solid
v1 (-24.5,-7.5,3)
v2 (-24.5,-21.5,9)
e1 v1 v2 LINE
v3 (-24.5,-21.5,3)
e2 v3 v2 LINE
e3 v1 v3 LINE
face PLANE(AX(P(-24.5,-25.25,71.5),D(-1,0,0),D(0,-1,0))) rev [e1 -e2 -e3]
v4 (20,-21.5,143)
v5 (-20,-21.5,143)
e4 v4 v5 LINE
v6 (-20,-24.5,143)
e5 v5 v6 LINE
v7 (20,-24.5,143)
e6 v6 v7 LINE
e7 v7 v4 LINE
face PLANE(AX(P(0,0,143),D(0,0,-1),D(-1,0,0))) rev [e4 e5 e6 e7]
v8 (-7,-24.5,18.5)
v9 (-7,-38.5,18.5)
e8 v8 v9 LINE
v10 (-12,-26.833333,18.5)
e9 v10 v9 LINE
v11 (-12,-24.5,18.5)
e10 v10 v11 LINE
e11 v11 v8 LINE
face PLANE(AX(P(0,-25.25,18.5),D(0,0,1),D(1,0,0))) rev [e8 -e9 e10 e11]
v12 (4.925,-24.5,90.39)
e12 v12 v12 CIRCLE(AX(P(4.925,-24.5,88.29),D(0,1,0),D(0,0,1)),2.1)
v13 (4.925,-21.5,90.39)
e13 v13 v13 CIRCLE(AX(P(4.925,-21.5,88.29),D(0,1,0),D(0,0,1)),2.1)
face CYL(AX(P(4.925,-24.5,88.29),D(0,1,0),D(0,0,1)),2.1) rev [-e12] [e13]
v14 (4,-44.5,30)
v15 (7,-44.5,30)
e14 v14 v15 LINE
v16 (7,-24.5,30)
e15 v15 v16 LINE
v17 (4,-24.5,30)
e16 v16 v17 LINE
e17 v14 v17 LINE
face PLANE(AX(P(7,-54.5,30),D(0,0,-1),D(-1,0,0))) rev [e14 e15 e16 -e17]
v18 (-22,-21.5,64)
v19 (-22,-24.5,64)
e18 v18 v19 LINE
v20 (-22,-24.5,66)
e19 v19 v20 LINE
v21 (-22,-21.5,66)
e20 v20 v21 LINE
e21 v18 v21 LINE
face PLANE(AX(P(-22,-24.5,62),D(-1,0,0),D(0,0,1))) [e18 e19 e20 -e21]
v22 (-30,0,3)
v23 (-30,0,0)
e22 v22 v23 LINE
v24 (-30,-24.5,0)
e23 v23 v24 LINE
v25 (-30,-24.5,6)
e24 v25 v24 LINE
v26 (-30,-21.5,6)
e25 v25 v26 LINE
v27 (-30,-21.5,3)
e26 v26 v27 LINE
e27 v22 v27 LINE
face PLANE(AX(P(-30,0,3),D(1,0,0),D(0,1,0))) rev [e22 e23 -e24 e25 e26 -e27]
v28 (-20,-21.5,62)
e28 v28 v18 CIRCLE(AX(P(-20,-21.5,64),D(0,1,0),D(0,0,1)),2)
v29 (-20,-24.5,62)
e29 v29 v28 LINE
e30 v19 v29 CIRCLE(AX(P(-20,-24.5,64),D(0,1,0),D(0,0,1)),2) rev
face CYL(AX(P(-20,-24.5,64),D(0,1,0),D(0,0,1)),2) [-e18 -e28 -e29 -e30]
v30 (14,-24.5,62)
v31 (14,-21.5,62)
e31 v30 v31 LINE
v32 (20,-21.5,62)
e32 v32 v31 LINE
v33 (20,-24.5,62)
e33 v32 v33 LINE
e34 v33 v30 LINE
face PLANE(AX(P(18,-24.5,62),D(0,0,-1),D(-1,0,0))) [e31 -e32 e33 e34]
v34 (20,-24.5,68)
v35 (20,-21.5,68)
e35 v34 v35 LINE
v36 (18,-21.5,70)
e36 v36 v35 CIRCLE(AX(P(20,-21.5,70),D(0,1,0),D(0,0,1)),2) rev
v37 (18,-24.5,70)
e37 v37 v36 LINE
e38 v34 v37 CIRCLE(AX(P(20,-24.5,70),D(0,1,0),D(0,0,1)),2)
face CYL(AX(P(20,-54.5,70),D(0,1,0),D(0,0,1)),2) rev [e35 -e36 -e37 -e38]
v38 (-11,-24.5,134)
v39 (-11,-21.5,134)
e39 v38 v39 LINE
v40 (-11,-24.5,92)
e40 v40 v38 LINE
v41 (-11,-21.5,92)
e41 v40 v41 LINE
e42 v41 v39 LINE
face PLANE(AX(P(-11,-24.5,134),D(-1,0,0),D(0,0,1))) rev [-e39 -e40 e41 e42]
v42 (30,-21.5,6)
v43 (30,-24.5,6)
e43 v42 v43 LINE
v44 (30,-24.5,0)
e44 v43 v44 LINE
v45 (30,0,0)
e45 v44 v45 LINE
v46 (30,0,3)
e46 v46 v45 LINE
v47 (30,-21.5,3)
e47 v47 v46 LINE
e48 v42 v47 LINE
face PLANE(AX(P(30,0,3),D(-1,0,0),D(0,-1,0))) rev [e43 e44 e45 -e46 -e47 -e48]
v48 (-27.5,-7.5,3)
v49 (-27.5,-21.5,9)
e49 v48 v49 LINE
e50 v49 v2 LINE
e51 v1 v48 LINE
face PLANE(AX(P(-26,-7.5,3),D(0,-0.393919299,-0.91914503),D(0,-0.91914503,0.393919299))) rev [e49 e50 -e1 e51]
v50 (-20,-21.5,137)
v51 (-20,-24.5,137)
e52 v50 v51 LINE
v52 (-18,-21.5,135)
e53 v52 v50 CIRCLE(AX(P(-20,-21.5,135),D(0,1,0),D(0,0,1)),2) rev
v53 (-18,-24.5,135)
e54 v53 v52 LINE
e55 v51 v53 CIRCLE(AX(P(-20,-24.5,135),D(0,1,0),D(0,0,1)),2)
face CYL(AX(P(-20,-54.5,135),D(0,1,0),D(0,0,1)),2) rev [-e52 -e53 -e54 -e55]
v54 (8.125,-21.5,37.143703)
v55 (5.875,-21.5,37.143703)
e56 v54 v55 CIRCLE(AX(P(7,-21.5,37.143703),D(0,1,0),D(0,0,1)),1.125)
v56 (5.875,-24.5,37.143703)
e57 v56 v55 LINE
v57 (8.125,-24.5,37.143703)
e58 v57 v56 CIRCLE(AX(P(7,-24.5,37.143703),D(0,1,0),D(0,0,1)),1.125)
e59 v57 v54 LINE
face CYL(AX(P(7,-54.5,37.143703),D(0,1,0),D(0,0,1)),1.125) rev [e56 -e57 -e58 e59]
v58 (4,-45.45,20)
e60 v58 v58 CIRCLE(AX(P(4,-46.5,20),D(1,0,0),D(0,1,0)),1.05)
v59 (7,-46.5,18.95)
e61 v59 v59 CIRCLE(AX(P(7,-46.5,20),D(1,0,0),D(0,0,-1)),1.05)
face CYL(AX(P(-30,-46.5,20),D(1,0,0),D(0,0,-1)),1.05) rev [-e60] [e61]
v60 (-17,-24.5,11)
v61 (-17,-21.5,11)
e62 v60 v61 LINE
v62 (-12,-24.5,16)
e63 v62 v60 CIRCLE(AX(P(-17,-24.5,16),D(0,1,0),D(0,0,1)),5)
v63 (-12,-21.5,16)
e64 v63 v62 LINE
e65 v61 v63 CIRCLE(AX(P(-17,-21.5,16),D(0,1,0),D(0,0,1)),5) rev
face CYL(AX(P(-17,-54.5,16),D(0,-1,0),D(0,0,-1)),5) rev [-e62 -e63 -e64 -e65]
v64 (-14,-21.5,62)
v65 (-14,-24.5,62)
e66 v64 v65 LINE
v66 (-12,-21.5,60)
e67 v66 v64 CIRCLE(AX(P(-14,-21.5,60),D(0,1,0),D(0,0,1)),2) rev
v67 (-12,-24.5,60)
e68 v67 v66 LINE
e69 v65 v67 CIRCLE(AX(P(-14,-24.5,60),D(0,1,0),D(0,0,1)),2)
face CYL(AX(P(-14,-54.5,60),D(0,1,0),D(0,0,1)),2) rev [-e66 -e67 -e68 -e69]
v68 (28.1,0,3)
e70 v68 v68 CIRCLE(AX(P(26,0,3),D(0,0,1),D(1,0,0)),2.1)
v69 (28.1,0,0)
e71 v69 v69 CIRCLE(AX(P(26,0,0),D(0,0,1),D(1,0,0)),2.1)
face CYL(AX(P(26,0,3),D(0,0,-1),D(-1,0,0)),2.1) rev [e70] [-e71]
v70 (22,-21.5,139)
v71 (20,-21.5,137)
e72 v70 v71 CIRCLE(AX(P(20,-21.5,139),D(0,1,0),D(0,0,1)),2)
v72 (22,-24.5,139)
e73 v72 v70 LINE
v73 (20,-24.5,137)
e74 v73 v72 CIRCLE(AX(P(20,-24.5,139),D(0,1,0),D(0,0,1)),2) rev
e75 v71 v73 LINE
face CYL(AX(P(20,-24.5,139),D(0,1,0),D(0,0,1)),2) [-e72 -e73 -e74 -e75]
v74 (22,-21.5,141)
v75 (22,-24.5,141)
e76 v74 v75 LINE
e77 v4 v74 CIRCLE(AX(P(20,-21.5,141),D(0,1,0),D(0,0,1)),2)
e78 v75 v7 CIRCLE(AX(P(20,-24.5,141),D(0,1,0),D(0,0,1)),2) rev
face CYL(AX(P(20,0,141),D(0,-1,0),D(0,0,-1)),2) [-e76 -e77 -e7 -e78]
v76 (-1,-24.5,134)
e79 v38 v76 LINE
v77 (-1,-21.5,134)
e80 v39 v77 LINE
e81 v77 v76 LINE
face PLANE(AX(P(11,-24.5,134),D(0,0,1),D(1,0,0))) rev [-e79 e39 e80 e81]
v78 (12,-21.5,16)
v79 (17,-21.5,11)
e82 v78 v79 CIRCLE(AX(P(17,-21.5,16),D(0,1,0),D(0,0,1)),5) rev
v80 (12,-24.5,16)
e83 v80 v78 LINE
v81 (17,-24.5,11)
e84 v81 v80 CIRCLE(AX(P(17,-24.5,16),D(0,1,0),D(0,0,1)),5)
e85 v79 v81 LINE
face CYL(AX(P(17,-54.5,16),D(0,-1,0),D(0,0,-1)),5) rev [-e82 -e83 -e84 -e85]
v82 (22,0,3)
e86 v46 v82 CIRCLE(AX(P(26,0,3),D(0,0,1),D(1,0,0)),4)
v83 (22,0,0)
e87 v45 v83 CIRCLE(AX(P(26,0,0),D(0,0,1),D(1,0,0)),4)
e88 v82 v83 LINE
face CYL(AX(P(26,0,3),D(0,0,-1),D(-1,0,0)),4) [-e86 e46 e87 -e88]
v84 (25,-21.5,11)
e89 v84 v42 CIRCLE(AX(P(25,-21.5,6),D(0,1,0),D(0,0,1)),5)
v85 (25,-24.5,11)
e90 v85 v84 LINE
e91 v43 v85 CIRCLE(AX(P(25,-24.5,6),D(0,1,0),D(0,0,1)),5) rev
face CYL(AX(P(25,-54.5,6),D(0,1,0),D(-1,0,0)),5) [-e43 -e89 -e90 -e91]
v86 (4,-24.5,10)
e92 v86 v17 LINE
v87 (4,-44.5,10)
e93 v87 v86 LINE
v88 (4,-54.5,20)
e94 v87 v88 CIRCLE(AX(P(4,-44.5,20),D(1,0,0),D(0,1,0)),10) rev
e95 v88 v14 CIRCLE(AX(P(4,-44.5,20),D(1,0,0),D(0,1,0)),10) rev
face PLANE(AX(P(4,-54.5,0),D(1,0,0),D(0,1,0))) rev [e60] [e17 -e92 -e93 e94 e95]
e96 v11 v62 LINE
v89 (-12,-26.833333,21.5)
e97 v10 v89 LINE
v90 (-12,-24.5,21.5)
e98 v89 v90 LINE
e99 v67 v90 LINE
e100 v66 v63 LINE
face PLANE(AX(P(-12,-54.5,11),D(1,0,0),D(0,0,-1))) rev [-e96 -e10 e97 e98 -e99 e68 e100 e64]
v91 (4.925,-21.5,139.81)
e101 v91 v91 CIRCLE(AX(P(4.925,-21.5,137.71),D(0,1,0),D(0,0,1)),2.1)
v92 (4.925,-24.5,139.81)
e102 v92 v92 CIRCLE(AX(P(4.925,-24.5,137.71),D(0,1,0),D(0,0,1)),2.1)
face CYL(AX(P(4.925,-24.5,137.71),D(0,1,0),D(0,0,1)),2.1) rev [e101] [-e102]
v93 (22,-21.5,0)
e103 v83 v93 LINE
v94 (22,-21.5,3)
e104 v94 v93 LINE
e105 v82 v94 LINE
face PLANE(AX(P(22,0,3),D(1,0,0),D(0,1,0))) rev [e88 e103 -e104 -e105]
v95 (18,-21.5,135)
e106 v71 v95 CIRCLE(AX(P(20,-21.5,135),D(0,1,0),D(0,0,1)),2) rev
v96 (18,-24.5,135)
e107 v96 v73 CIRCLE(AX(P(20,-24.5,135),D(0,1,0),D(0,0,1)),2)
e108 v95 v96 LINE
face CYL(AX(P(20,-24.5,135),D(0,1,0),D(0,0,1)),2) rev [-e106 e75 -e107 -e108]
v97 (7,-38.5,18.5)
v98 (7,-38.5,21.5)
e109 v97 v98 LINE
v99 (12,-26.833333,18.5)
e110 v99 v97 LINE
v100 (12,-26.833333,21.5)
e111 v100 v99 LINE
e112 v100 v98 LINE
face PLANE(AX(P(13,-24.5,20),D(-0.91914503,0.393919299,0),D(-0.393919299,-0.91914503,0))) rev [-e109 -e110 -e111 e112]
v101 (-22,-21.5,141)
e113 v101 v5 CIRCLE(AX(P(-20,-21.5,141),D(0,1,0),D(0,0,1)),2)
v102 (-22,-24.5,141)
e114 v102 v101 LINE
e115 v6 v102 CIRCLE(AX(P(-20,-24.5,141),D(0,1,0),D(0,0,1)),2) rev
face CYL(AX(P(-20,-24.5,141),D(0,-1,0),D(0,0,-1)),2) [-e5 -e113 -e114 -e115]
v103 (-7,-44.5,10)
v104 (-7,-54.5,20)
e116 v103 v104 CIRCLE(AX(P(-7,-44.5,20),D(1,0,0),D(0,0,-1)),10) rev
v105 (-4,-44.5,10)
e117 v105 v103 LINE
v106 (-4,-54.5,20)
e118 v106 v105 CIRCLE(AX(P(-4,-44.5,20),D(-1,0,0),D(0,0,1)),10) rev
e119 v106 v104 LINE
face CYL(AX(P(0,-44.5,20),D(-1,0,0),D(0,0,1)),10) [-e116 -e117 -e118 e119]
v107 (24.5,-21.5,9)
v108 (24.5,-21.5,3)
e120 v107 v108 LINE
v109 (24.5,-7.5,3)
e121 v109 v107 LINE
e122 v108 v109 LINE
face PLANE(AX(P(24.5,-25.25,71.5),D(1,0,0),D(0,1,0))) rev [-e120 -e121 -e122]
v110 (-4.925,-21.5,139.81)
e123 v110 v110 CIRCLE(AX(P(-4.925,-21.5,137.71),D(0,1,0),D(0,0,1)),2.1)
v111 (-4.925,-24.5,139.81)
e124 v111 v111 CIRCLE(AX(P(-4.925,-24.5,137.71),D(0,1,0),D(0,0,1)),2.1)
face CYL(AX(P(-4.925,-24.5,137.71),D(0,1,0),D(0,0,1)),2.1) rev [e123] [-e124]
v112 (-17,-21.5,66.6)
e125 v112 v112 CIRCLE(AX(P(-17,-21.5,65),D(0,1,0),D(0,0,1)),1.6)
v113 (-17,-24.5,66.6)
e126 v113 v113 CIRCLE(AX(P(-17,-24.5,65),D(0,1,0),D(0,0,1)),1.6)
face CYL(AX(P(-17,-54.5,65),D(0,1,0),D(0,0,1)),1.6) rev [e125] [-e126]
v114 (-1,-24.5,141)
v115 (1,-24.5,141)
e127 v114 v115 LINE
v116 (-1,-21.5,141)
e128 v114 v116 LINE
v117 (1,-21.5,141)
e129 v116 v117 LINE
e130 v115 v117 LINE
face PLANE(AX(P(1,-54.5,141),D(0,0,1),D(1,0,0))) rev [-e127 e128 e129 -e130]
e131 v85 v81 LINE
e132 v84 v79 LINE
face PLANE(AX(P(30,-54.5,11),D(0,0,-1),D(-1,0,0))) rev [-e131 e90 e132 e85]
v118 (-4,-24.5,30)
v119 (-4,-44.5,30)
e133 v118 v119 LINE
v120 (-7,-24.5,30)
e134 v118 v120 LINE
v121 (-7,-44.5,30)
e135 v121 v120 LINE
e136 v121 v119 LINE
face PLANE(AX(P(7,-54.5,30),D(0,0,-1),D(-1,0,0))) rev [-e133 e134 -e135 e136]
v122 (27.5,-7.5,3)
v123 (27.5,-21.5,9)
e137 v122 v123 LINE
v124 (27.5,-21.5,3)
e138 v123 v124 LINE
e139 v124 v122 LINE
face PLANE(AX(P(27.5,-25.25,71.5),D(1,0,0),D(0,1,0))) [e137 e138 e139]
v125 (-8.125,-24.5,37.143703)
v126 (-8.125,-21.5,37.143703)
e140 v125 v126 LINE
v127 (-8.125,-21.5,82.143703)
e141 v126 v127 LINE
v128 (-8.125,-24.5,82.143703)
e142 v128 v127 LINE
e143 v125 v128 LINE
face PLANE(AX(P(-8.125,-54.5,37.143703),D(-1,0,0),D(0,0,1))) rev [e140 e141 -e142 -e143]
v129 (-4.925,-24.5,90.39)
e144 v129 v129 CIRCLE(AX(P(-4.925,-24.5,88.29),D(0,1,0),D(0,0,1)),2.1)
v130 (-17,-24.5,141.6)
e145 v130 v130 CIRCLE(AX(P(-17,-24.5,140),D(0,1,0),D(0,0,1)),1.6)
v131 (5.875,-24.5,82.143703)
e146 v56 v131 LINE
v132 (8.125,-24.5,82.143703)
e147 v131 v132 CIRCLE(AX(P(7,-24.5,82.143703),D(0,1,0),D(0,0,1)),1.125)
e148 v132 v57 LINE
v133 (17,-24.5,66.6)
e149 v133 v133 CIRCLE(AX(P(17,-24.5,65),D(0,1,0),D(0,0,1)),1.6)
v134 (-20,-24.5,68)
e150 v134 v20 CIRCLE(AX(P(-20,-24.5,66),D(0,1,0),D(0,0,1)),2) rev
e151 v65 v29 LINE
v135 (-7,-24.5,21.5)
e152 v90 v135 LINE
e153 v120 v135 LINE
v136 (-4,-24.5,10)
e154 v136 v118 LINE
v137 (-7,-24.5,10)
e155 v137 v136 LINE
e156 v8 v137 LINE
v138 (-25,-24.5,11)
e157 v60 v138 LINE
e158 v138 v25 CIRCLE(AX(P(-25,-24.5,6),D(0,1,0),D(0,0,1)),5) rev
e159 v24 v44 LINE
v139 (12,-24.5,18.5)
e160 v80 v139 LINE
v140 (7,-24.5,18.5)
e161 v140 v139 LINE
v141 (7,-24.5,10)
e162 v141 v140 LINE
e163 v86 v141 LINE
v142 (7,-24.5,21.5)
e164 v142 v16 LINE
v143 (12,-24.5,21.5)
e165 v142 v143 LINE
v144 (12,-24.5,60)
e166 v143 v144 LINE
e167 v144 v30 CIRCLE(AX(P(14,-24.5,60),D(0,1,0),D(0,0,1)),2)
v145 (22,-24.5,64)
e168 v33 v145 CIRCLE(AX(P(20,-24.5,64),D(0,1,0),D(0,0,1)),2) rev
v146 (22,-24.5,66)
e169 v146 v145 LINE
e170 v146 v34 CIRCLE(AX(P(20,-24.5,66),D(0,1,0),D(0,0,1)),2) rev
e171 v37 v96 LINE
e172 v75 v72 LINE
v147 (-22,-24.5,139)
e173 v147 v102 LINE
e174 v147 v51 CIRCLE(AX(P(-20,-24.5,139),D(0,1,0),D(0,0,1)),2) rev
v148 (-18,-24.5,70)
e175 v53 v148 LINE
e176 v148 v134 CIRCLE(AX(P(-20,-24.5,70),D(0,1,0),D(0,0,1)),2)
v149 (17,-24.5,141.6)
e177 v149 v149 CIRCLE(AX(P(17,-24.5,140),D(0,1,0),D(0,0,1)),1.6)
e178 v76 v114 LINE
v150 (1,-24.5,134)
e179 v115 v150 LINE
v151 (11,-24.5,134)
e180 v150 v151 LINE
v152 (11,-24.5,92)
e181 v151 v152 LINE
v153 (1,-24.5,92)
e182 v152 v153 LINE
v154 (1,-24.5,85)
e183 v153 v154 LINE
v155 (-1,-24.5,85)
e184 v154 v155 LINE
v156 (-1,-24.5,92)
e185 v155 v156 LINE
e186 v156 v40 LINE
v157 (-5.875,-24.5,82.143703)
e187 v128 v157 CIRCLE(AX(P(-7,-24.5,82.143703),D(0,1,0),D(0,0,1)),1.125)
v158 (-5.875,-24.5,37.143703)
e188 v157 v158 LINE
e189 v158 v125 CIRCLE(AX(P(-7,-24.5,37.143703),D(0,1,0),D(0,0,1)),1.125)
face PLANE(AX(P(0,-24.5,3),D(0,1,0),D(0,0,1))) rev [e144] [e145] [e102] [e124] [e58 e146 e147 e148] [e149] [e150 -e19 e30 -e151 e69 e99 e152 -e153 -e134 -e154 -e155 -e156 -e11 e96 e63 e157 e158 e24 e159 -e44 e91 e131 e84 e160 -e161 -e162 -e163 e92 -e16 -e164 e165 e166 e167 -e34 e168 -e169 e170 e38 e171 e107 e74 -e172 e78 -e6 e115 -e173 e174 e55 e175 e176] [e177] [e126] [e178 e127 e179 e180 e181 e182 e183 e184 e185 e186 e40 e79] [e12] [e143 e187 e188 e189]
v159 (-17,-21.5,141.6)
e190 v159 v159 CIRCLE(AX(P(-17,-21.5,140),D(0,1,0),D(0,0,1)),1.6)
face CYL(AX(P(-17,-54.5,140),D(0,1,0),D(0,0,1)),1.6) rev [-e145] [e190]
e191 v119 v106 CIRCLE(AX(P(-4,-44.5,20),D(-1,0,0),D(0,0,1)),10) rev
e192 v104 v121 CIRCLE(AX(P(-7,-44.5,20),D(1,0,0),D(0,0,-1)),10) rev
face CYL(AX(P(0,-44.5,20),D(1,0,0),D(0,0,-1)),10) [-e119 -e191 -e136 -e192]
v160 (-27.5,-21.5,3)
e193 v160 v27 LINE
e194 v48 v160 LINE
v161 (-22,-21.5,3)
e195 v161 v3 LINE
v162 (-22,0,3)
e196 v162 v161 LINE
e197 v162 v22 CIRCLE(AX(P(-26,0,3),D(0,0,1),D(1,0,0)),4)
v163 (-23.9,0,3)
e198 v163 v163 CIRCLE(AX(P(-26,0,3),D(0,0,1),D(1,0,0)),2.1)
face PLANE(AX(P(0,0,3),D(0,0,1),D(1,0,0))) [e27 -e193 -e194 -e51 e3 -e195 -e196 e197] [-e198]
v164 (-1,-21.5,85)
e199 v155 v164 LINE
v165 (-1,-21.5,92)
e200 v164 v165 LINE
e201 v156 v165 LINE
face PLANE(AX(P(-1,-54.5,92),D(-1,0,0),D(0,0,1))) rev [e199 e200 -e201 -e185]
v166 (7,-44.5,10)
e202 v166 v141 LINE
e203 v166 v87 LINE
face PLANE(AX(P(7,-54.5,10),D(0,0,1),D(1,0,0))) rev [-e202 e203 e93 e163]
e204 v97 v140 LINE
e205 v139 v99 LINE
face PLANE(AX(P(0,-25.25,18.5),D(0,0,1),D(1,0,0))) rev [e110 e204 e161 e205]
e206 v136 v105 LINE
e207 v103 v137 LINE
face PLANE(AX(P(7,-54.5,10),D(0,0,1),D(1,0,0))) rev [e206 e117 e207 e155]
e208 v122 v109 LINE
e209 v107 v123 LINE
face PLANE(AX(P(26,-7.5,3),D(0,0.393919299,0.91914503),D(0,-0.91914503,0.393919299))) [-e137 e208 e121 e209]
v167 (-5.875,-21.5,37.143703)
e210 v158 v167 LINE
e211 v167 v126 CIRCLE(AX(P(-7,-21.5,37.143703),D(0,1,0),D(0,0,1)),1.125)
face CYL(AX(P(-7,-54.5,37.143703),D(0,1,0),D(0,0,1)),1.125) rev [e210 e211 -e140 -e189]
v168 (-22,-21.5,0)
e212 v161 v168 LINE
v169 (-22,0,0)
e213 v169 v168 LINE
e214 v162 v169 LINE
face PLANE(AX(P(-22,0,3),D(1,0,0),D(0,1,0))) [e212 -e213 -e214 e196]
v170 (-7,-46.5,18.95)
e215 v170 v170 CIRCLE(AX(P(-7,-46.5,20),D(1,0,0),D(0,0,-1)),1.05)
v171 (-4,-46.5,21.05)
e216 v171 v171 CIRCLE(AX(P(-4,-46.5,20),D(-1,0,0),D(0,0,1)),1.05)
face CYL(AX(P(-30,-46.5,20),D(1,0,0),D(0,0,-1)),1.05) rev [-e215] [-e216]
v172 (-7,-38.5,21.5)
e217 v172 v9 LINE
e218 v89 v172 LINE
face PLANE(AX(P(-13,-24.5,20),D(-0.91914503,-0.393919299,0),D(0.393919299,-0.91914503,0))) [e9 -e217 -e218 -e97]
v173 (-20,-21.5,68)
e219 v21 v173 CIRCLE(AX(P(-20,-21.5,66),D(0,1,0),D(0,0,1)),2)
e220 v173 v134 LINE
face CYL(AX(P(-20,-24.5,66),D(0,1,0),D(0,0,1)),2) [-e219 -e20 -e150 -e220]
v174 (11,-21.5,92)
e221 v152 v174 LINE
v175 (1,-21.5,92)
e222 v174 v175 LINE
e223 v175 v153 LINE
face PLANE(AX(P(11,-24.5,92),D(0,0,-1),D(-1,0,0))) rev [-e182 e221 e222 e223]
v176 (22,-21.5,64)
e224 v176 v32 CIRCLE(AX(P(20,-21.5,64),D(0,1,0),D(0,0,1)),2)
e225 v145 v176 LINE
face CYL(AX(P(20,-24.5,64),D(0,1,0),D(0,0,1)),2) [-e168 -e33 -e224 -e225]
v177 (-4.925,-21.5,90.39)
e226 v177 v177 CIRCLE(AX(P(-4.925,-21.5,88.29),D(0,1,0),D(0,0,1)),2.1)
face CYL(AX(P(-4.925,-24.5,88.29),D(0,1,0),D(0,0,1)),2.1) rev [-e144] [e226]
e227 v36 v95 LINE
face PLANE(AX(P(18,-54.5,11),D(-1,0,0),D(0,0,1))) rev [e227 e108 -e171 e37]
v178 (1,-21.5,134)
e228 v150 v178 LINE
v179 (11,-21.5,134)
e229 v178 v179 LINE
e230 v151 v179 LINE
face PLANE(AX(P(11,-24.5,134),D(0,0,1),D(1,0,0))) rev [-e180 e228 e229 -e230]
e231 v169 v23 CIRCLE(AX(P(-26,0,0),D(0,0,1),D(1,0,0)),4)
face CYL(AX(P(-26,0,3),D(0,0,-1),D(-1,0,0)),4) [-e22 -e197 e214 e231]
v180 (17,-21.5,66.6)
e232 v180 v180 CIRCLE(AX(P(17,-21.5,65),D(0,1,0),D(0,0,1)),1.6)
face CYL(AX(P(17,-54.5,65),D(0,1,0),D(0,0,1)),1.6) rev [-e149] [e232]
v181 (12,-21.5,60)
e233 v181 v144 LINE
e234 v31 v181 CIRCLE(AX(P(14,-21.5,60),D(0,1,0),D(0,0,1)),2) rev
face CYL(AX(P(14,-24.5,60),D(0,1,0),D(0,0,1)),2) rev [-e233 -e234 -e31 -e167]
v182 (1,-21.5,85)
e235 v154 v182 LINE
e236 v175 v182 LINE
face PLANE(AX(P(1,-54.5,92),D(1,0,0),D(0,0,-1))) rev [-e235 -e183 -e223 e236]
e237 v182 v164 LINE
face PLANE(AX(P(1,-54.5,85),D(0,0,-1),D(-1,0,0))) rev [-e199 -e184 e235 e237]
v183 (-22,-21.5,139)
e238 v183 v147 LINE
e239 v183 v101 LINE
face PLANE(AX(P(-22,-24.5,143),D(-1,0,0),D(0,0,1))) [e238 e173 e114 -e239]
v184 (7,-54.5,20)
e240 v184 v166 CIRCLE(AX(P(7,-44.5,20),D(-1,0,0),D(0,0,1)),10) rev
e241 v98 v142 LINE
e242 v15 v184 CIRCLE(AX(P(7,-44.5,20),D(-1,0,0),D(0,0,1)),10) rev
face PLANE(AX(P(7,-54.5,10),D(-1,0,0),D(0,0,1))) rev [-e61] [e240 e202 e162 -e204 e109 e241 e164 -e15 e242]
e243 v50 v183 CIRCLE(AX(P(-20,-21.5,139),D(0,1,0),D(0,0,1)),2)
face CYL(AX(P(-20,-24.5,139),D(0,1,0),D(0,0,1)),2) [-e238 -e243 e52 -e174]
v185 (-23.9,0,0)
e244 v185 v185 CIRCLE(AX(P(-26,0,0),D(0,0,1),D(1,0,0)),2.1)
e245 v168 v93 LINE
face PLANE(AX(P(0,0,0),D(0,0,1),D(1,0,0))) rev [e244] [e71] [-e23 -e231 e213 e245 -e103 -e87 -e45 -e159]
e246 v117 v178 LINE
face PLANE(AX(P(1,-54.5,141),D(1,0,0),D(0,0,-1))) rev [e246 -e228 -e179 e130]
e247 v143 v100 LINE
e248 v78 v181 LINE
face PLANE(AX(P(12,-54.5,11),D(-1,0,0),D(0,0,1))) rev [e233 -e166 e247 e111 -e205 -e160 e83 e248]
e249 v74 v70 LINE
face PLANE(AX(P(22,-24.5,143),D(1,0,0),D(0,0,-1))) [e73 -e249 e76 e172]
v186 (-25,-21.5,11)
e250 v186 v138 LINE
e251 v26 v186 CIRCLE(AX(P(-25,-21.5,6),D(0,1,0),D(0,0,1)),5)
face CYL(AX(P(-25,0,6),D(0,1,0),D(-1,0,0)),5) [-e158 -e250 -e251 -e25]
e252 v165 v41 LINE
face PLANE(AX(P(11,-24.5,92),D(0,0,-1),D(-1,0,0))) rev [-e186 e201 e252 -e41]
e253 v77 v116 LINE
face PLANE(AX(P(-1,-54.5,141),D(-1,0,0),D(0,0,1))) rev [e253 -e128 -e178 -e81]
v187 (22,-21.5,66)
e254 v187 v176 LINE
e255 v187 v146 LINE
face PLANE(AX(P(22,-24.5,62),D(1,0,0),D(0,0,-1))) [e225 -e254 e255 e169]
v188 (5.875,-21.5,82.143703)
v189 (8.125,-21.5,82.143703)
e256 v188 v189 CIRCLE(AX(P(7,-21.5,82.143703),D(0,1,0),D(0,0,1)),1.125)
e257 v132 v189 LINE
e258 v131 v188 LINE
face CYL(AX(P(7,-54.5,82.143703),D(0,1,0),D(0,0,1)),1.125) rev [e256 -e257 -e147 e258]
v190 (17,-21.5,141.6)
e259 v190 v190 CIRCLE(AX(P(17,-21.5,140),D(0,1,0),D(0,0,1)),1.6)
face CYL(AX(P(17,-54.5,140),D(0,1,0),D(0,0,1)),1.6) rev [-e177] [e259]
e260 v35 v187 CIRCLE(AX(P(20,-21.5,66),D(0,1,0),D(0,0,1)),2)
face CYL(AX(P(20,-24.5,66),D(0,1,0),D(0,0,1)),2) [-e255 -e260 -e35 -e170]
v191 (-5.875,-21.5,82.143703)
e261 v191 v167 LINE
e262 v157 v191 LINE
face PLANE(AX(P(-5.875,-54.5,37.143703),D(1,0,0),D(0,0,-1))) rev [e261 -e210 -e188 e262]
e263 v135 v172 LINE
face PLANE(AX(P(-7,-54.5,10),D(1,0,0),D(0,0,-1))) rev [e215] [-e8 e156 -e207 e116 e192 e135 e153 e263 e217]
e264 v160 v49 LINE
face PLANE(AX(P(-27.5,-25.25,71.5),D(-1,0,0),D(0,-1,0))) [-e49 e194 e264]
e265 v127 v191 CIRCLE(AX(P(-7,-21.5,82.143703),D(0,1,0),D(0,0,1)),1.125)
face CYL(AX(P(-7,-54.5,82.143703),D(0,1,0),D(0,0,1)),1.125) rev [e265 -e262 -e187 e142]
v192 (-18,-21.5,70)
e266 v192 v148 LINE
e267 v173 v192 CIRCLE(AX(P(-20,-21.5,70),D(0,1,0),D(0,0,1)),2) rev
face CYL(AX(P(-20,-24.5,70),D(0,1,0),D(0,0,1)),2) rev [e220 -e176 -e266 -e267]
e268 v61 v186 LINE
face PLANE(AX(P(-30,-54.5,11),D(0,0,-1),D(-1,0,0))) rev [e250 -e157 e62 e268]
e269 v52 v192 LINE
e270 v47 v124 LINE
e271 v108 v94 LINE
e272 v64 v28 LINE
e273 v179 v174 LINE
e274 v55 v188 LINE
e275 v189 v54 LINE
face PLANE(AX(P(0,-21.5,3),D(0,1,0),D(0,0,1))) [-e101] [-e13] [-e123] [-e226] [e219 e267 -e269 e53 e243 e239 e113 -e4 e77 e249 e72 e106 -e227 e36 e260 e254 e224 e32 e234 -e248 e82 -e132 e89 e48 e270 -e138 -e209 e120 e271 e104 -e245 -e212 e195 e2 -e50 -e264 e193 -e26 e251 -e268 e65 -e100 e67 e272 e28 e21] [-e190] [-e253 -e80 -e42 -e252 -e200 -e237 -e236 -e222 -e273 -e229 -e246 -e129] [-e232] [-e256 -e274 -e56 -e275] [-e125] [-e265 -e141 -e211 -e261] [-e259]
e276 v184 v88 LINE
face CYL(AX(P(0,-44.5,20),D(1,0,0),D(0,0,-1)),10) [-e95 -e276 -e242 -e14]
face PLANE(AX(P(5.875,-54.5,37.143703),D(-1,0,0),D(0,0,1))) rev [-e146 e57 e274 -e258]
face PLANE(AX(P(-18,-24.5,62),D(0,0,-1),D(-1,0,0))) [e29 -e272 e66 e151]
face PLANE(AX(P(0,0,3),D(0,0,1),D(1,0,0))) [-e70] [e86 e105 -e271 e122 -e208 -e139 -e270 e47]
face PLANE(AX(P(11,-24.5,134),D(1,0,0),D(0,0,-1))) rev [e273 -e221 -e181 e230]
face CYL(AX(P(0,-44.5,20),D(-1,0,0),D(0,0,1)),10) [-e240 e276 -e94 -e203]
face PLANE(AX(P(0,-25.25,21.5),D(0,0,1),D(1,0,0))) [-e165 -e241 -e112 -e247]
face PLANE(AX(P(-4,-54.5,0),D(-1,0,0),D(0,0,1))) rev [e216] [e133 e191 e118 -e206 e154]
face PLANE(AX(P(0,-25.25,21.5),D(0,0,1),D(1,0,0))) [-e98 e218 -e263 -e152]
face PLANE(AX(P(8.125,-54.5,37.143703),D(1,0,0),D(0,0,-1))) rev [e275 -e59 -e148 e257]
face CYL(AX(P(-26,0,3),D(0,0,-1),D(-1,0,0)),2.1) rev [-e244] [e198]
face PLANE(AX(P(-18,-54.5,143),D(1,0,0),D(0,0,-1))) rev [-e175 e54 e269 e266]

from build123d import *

# Parameters (mm, degrees)
SKETCH_1_R           = 2.1
EXTRUDE_1_DEPTH      = 3
SKETCH_2_W           = 60
SKETCH_2_H           = 3
EXTRUDE_2_DEPTH      = 80
SKETCH_3_W           = 60
SKETCH_3_H           = 3
EXTRUDE_3_DEPTH      = 60
SKETCH_4_R           = 2.1
SKETCH_4_W           = 22
SKETCH_4_H           = 42
CUT_EXTRUDE_1_DEPTH  = 149.321441471
SKETCH_5_W           = 14
SKETCH_5_H           = 20
EXTRUDE_4_DEPTH      = 30
SKETCH_6_W           = 8
SKETCH_6_H           = 30
CUT_EXTRUDE_2_DEPTH  = 129.993216876
SKETCH_7_R           = 1.05
CUT_EXTRUDE_3_DEPTH  = 158.442846773
SKETCH_8_W           = 2
SKETCH_8_H           = 7
CUT_EXTRUDE_4_DEPTH  = 150.793190766
SKETCH_9_W           = 12
SKETCH_9_H           = 132
CUT_EXTRUDE_5_DEPTH  = 150.793190766
SKETCH_12_W          = 4
SKETCH_12_H          = 6
EXTRUDE_5_DEPTH      = 3
SKETCH_13_R          = 1.6
CUT_EXTRUDE_8_DEPTH  = 150.793190766
RIB_25_REACH         = 164.958
SKETCH_19_WALL_W     = 343.147179466
SKETCH_19_WALL_H     = 3
RIB_30_REACH         = 164.958
SKETCH_20_WALL_W     = 343.147179466
SKETCH_20_WALL_H     = 3
RIB_38_REACH         = 139.838
SKETCH_21_WALL_W     = 292.907080128
SKETCH_21_WALL_H     = 3
RIB_39_REACH         = 139.838
SKETCH_22_WALL_W     = 292.907080128
SKETCH_22_WALL_H     = 3
CUT_EXTRUDE_9_DEPTH  = 150.793190766
SKETCH_24_W          = 6
SKETCH_24_H          = 51
CUT_EXTRUDE_10_DEPTH = 150.793190766
FILLET_1_R           = 5
FILLET_2_R           = 2
FILLET_3_R           = 10


with BuildPart() as part:
    # 草图1 → 凸台-拉伸1 (new body)
    with BuildSketch(Plane.XY):
        with BuildLine():
            Line((-22, 0), (-22, -21.5))
            Line((-22, -21.5), (22, -21.5))
            Line((22, -21.5), (22, 0))
            ThreePointArc((22, 0), (26, 4), (30, 0))
            Line((30, 0), (30, -24.5))
            Line((30, -24.5), (-30, -24.5))
            Line((-30, -24.5), (-30, 0))
            ThreePointArc((-30, 0), (-26, 4), (-22, 0))
        make_face()
        with Locations((-26, 0)):
            Circle(SKETCH_1_R, mode=Mode.SUBTRACT)
        with Locations((26, 0)):
            Circle(SKETCH_1_R, mode=Mode.SUBTRACT)
    extrude(amount=EXTRUDE_1_DEPTH)

    # 草图2 → 凸台-拉伸2 (add)
    with BuildSketch(Plane.XY.offset(3)):
        with Locations((0, -23)):
            Rectangle(SKETCH_2_W, SKETCH_2_H)
    extrude(amount=EXTRUDE_2_DEPTH)

    # 草图3 → 凸台-拉伸3 (add)
    with BuildSketch(Plane.XY.offset(83)):
        with Locations((0, -23)):
            Rectangle(SKETCH_3_W, SKETCH_3_H)
    extrude(amount=EXTRUDE_3_DEPTH)

    # 草图4 → 切除-拉伸1 (cut, through all)
    with BuildSketch(Plane(origin=(0, -21.5, 0), x_dir=(1, 0, 0), z_dir=(0, 1, 0))):
        with Locations(Location((-4.925, -88.29, 0), (0, 0, 270))):
            Circle(SKETCH_4_R)
        with Locations(Location((4.925, -88.29, 0), (0, 0, 270))):
            Circle(SKETCH_4_R)
        with Locations(Location((-4.925, -137.71, 0), (0, 0, 270))):
            Circle(SKETCH_4_R)
        with Locations(Location((4.925, -137.71, 0), (0, 0, 270))):
            Circle(SKETCH_4_R)
        with Locations((0, -113)):
            Rectangle(SKETCH_4_W, SKETCH_4_H)
    extrude(amount=-CUT_EXTRUDE_1_DEPTH, mode=Mode.SUBTRACT)

    # 草图5 → 凸台-拉伸4 (add)
    with BuildSketch(Plane.XZ.offset(24.5)):
        with Locations((0, 20)):
            Rectangle(SKETCH_5_W, SKETCH_5_H)
    extrude(amount=EXTRUDE_4_DEPTH)

    # 草图6 → 切除-拉伸2 (cut, through all)
    with BuildSketch(Plane.XY.offset(30)):
        with Locations((0, -39.5)):
            Rectangle(SKETCH_6_W, SKETCH_6_H)
    extrude(amount=-CUT_EXTRUDE_2_DEPTH, mode=Mode.SUBTRACT)

    # 草图7 → 切除-拉伸3 (cut, through all)
    with BuildSketch(Plane(origin=(7, 0, 0), x_dir=(0, 0, -1), z_dir=(1, 0, 0))):
        with Locations((-20, -46.5)):
            Circle(SKETCH_7_R)
    extrude(amount=-CUT_EXTRUDE_3_DEPTH, mode=Mode.SUBTRACT)

    # 草图8 → 切除-拉伸4 (cut, through all)
    with BuildSketch(Plane(origin=(0, -21.5, 0), x_dir=(1, 0, 0), z_dir=(0, 1, 0))):
        with Locations((0, -88.5)):
            Rectangle(SKETCH_8_W, SKETCH_8_H)
        with Locations((0, -137.5)):
            Rectangle(SKETCH_8_W, SKETCH_8_H)
    extrude(amount=-CUT_EXTRUDE_4_DEPTH, mode=Mode.SUBTRACT)

    # 草图9 → 切除-拉伸5 (cut, through all)
    with BuildSketch(Plane(origin=(0, -21.5, 0), x_dir=(1, 0, 0), z_dir=(0, 1, 0))):
        with Locations((24, -77)):
            Rectangle(SKETCH_9_W, SKETCH_9_H)
        with Locations((-24, -77)):
            Rectangle(SKETCH_9_W, SKETCH_9_H)
    extrude(amount=-CUT_EXTRUDE_5_DEPTH, mode=Mode.SUBTRACT)

    # 草图12 → 凸台-拉伸5 (add)
    with BuildSketch(Plane(origin=(0, -21.5, 0), x_dir=(1, 0, 0), z_dir=(0, 1, 0))):
        with Locations((20, -140)):
            Rectangle(SKETCH_12_W, SKETCH_12_H)
        with Locations((-20, -140)):
            Rectangle(SKETCH_12_W, SKETCH_12_H)
        with Locations((-20, -65)):
            Rectangle(SKETCH_12_W, SKETCH_12_H)
        with Locations((20, -65)):
            Rectangle(SKETCH_12_W, SKETCH_12_H)
    extrude(amount=-EXTRUDE_5_DEPTH)

    # 草图13 → 切除-拉伸8 (cut, through all)
    with BuildSketch(Plane(origin=(0, -21.5, 0), x_dir=(1, 0, 0), z_dir=(0, 1, 0))):
        with Locations(Location((-17, -140, 0), (0, 0, 270))):
            Circle(SKETCH_13_R)
        with Locations(Location((17, -140, 0), (0, 0, 270))):
            Circle(SKETCH_13_R)
        with Locations(Location((-17, -65, 0), (0, 0, 270))):
            Circle(SKETCH_13_R)
        with Locations(Location((17, -65, 0), (0, 0, 270))):
            Circle(SKETCH_13_R)
    extrude(amount=-CUT_EXTRUDE_8_DEPTH, mode=Mode.SUBTRACT)

    # 草图19 wall → 筋25 (add, up to next)
    with BuildSketch(Plane(origin=(-26, -14.5, 6), x_dir=(0, -0.919145030018, 0.393919298579), z_dir=(0, 0.393919298579, 0.919145030018)), mode=Mode.PRIVATE) as rib_25_sk1:
        Rectangle(SKETCH_19_WALL_W, SKETCH_19_WALL_H)
    rib_25_tool1 = extrude(rib_25_sk1.sketch, amount=-RIB_25_REACH, mode=Mode.PRIVATE) - part.part
    add(rib_25_tool1.solids().sort_by_distance((-26, -14.5, 6))[0])

    # 草图20 wall → 筋30 (add, up to next)
    with BuildSketch(Plane(origin=(26, -14.5, 6), x_dir=(0, -0.919145030018, 0.393919298579), z_dir=(0, -0.393919298579, -0.919145030018)), mode=Mode.PRIVATE) as rib_30_sk1:
        Rectangle(SKETCH_20_WALL_W, SKETCH_20_WALL_H)
    rib_30_tool1 = extrude(rib_30_sk1.sketch, amount=RIB_30_REACH, mode=Mode.PRIVATE) - part.part
    add(rib_30_tool1.solids().sort_by_distance((26, -14.5, 6))[0])

    # 草图21 wall → 筋38 (add, up to next)
    with BuildSketch(Plane(origin=(-10, -31.5, 20), x_dir=(0.393919298579, -0.919145030018, 0), z_dir=(0.919145030018, 0.393919298579, 0)), mode=Mode.PRIVATE) as rib_38_sk1:
        Rectangle(SKETCH_21_WALL_W, SKETCH_21_WALL_H)
    rib_38_tool1 = extrude(rib_38_sk1.sketch, amount=RIB_38_REACH, mode=Mode.PRIVATE) - part.part
    add(rib_38_tool1.solids().sort_by_distance((-10, -31.5, 20))[0])

    # 草图22 wall → 筋39 (add, up to next)
    with BuildSketch(Plane(origin=(10, -31.5, 20), x_dir=(-0.393919298579, -0.919145030018, 0), z_dir=(0.919145030018, -0.393919298579, 0)), mode=Mode.PRIVATE) as rib_39_sk1:
        Rectangle(SKETCH_22_WALL_W, SKETCH_22_WALL_H)
    rib_39_tool1 = extrude(rib_39_sk1.sketch, amount=-RIB_39_REACH, mode=Mode.PRIVATE) - part.part
    add(rib_39_tool1.solids().sort_by_distance((10, -31.5, 20))[0])

    # 草图23 → 切除-拉伸9 (cut, through all)
    with BuildSketch(Plane(origin=(0, -21.5, 0), x_dir=(1, 0, 0), z_dir=(0, 1, 0))):
        with BuildLine():
            Line((-5.875, -37.143702513), (-5.875, -82.143702513))
            ThreePointArc((-5.875, -82.143702513), (-7, -83.268702513), (-8.125, -82.143702513))
            Line((-8.125, -82.143702513), (-8.125, -37.143702513))
            ThreePointArc((-8.125, -37.143702513), (-7, -36.018702513), (-5.875, -37.143702513))
        make_face()
        with BuildLine():
            Line((8.125, -37.143702513), (8.125, -82.143702513))
            ThreePointArc((8.125, -82.143702513), (7, -83.268702513), (5.875, -82.143702513))
            Line((5.875, -82.143702513), (5.875, -37.143702513))
            ThreePointArc((5.875, -37.143702513), (7, -36.018702513), (8.125, -37.143702513))
        make_face()
    extrude(amount=-CUT_EXTRUDE_9_DEPTH, mode=Mode.SUBTRACT)

    # 草图24 → 切除-拉伸10 (cut, through all)
    with BuildSketch(Plane(origin=(0, -21.5, 0), x_dir=(1, 0, 0), z_dir=(0, 1, 0))):
        with Locations((-15, -36.5)):
            Rectangle(SKETCH_24_W, SKETCH_24_H)
        with Locations((15, -36.5)):
            Rectangle(SKETCH_24_W, SKETCH_24_H)
    extrude(amount=-CUT_EXTRUDE_10_DEPTH, mode=Mode.SUBTRACT)

    # 圆角1
    fillet_1_edges = [part.edges().sort_by_distance(p)[0] for p in [
        (30, -23, 11),
        (-30, -23, 11),
        (-12, -23, 11),
        (12, -23, 11),
    ]]
    fillet(fillet_1_edges, radius=FILLET_1_R)

    # 圆角2
    fillet_2_edges = [part.edges().sort_by_distance(p)[0] for p in [
        (18, -23, 137),
        (22, -23, 137),
        (22, -23, 143),
        (-22, -23, 143),
        (-22, -23, 137),
        (-18, -23, 137),
        (-18, -23, 68),
        (18, -23, 68),
        (22, -23, 68),
        (22, -23, 62),
        (12, -23, 62),
        (-22, -23, 62),
        (-12, -23, 62),
        (-22, -23, 68),
    ]]
    fillet(fillet_2_edges, radius=FILLET_2_R - 0.0001)  # a hair under: the kernel refuses the full size

    # 圆角3
    fillet_3_edges = [part.edges().sort_by_distance(p)[0] for p in [
        (5.5, -54.5, 10),
        (-5.5, -54.5, 10),
        (-5.5, -54.5, 30),
        (5.5, -54.5, 30),
    ]]
    fillet(fillet_3_edges, radius=FILLET_3_R - 0.0001)  # a hair under: the kernel refuses the full size


solid = part.part
